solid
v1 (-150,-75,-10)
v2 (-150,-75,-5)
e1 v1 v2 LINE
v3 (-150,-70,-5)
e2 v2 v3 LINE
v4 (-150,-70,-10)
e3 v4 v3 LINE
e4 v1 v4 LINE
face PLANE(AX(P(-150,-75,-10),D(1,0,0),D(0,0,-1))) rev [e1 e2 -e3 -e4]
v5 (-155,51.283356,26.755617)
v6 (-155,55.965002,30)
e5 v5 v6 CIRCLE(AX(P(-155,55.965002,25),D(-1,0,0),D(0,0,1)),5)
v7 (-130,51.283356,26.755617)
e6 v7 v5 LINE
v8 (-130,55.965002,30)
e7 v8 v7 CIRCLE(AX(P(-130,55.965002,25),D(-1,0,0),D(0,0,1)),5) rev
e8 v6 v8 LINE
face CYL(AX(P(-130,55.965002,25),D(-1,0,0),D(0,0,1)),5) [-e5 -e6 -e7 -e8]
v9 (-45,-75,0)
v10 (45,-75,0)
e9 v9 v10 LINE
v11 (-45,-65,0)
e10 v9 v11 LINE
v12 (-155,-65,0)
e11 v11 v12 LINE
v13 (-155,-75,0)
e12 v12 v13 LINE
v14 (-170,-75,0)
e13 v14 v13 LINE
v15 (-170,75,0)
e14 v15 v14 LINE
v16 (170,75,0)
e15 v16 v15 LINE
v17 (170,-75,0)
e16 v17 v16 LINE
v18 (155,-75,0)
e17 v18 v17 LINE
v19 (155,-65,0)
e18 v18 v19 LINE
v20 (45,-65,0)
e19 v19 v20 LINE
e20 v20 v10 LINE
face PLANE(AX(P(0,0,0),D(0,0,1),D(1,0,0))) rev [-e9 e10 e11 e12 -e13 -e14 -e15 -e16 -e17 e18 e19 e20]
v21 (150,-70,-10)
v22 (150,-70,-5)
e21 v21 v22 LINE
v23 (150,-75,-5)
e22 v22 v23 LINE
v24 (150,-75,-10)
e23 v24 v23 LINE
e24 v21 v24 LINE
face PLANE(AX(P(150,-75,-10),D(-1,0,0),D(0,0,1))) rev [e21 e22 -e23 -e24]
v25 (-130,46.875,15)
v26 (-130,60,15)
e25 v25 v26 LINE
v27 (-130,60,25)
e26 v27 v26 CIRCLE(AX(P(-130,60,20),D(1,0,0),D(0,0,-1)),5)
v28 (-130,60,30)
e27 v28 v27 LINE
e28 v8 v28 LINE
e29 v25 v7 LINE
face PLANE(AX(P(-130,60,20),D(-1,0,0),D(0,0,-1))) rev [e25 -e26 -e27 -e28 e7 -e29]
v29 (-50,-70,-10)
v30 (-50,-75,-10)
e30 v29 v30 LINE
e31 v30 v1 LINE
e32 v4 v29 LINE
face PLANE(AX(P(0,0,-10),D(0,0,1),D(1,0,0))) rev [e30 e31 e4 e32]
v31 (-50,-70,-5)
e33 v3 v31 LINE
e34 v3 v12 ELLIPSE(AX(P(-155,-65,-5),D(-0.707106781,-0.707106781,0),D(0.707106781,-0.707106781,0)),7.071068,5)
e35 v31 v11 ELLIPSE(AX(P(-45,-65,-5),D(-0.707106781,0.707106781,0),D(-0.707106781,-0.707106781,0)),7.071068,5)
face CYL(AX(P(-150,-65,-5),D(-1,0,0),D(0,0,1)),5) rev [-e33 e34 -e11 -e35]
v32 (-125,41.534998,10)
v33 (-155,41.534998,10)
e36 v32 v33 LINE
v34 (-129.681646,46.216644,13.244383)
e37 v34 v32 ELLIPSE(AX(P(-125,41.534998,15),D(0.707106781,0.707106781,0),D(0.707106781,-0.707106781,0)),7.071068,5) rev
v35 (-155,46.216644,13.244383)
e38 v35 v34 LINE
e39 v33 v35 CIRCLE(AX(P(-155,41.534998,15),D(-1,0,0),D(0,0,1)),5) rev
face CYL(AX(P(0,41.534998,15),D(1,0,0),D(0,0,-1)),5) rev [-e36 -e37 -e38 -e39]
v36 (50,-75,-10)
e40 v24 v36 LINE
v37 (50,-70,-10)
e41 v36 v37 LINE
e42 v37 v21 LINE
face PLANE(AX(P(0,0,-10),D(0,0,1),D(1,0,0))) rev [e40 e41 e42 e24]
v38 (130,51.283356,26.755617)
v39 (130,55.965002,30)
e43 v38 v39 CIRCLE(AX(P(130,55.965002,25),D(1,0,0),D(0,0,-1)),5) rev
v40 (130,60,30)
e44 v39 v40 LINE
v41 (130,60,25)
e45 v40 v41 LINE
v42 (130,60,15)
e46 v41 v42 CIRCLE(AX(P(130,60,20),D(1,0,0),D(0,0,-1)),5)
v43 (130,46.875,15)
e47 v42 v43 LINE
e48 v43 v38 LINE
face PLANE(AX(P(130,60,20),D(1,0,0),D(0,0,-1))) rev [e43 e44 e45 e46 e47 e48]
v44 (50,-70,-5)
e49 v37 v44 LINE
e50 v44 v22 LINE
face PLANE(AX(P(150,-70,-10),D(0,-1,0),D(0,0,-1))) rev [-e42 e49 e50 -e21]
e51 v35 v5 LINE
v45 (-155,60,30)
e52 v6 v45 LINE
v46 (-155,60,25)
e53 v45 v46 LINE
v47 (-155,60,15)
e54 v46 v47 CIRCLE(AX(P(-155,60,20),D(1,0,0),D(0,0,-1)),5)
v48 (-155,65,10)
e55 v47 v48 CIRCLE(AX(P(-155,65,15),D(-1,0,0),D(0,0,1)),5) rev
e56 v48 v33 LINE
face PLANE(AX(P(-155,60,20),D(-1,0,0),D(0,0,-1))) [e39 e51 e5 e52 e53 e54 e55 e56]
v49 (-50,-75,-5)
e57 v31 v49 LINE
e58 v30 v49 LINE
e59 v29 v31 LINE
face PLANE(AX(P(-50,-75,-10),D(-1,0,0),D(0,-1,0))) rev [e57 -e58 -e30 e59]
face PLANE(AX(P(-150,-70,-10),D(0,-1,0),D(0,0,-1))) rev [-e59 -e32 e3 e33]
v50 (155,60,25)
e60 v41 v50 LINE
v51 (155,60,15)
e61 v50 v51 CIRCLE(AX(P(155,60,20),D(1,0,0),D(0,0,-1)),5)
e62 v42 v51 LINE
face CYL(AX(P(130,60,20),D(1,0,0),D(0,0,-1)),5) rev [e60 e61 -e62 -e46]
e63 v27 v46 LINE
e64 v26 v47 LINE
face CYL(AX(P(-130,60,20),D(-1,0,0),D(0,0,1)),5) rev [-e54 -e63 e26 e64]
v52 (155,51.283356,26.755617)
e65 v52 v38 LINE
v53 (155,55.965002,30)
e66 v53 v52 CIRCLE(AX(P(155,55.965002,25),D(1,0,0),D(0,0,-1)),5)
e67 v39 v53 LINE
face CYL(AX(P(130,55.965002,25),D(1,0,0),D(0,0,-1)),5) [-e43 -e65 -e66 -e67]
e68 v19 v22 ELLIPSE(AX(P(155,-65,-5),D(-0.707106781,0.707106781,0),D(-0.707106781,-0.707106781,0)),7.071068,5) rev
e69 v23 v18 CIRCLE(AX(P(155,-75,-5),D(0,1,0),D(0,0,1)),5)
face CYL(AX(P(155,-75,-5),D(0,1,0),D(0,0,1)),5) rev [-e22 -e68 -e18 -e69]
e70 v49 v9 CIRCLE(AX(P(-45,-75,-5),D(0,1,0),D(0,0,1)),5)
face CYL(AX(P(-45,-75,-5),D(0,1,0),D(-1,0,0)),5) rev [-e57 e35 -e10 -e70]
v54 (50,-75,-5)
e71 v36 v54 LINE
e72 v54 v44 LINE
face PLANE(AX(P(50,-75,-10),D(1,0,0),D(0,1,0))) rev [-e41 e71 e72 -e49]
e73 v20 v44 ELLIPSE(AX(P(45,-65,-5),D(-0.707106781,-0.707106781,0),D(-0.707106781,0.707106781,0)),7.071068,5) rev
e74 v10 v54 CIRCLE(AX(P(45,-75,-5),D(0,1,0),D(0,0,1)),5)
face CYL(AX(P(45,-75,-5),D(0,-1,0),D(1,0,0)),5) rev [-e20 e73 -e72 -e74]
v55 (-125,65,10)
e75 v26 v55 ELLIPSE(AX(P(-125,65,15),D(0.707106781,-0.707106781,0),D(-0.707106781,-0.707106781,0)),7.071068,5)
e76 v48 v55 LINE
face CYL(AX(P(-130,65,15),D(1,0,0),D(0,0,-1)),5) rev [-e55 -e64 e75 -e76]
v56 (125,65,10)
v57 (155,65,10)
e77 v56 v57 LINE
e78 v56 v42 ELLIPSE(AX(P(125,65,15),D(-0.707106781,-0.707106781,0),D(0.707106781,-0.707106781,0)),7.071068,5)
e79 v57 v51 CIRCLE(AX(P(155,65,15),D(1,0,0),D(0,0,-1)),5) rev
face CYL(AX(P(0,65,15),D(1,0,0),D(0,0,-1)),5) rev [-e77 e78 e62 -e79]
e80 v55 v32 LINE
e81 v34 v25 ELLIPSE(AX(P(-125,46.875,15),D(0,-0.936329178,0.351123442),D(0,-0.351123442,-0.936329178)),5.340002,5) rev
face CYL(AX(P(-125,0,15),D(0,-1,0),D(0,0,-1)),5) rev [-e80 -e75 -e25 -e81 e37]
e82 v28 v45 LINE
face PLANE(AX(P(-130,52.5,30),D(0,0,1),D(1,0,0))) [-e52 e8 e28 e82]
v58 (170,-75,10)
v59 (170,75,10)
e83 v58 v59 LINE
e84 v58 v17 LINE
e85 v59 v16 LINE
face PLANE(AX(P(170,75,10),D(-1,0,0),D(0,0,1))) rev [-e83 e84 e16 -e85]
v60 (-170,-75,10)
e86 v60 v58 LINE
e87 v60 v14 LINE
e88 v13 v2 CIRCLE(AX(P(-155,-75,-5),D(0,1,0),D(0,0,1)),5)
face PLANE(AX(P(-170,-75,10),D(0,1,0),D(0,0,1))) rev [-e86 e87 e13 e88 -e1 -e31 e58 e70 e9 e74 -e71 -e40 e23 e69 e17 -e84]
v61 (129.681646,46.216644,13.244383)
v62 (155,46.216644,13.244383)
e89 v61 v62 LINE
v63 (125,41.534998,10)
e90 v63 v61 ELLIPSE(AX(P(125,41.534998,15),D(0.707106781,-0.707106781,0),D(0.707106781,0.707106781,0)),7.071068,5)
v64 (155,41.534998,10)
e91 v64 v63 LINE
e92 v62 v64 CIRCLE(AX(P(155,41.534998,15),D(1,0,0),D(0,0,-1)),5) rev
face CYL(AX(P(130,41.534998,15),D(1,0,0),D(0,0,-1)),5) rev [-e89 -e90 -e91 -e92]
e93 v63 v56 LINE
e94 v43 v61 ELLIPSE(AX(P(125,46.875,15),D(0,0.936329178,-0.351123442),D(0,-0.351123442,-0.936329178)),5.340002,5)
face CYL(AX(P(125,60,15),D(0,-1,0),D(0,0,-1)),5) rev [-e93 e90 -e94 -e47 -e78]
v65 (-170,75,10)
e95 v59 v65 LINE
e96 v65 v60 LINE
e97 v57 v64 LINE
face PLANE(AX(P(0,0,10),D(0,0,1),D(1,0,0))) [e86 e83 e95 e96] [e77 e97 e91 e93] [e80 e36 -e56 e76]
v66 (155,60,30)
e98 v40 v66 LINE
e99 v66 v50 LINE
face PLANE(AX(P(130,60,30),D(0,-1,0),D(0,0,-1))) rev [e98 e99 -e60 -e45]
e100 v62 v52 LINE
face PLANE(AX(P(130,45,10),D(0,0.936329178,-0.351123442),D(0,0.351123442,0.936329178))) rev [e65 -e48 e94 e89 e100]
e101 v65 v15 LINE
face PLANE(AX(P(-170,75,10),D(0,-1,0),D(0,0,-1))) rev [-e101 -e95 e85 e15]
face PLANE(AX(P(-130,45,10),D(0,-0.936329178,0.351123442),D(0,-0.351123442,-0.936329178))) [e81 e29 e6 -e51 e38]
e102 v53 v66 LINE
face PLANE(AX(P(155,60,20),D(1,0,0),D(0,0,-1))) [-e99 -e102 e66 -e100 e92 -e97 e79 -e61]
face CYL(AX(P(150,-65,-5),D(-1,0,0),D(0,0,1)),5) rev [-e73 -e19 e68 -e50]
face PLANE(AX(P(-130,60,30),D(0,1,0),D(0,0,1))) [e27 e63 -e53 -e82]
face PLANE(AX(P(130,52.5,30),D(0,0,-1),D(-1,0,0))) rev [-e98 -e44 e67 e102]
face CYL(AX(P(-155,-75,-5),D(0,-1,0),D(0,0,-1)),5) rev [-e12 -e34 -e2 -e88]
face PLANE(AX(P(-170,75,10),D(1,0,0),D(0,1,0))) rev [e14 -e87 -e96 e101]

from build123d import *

# Parameters (mm, degrees)
SKETCH1_W                                     = 340
SKETCH1_H                                     = 150
VERTICAL_PORTION_DEPTH                        = 10
SHAFT_ADAPTER_RIGHT_DEPTH                     = 25
SHAFT_ADAPTER_FILLETS_R                       = 5
SKETCH5_W                                     = 100
SKETCH5_H                                     = 5
LIMIT_TAB_PREVENTS_GATE_FROM_GETTING_PU_DEPTH = 10
LIMIT_TAB_FILLETS_R                           = 5


with BuildPart() as part:
    # Sketch1 → Vertical portion (new body)
    with BuildSketch(Plane.XY):
        Rectangle(SKETCH1_W, SKETCH1_H)
    extrude(amount=VERTICAL_PORTION_DEPTH)

    # Sketch4 → Shaft adapter right (add)
    with BuildSketch(Plane(origin=(155, 0, 0), x_dir=(0, 0, -1), z_dir=(1, 0, 0))):
        with BuildLine():
            Line((-10, 45), (-30, 52.5))
            Line((-30, 52.5), (-30, 60))
            Line((-30, 60), (-25, 60))
            ThreePointArc((-25, 60), (-20, 55), (-15, 60))
            Line((-15, 60), (-10, 60))
            Line((-10, 60), (-10, 55))
            Line((-10, 55), (-10, 45))
        make_face()
    shaft_adapter_right = extrude(amount=-SHAFT_ADAPTER_RIGHT_DEPTH)

    # Shaft adapter left: Shaft adapter right across plane
    add(shaft_adapter_right.mirror(Plane(origin=(0, 0, 0), x_dir=(0, 0, 1), z_dir=(1, 0, 0))))

    # Shaft adapter fillets
    shaft_adapter_fillets_edges = [part.edges().sort_by_distance(p)[0] for p in [
        (-142.5, 52.5, 30),
        (142.5, 52.5, 30),
        (130, 52.5, 10),
        (-130, 52.5, 10),
        (-142.5, 45, 10),
        (142.5, 45, 10),
        (142.5, 60, 10),
        (-142.5, 60, 10),
    ]]
    fillet(shaft_adapter_fillets_edges, radius=SHAFT_ADAPTER_FILLETS_R - 0.0001)  # a hair under: the kernel refuses the full size

    # Sketch5 → Limit tab (prevents gate from getting pushed out of slot) (add)
    with BuildSketch(Plane(origin=(0, 0, 0), x_dir=(-1, 0, 0), z_dir=(0, 0, -1))):
        with Locations((-100, -72.5)):
            Rectangle(SKETCH5_W, SKETCH5_H)
        with Locations((100, -72.5)):
            Rectangle(SKETCH5_W, SKETCH5_H)
    extrude(amount=LIMIT_TAB_PREVENTS_GATE_FROM_GETTING_PU_DEPTH)

    # Limit tab fillets
    limit_tab_fillets_edges = [part.edges().sort_by_distance(p)[0] for p in [
        (150, -72.5, 0),
        (50, -72.5, 0),
        (100, -70, 0),
        (-150, -72.5, 0),
        (-100, -70, 0),
        (-50, -72.5, 0),
    ]]
    fillet(limit_tab_fillets_edges, radius=LIMIT_TAB_FILLETS_R)


solid = part.part
